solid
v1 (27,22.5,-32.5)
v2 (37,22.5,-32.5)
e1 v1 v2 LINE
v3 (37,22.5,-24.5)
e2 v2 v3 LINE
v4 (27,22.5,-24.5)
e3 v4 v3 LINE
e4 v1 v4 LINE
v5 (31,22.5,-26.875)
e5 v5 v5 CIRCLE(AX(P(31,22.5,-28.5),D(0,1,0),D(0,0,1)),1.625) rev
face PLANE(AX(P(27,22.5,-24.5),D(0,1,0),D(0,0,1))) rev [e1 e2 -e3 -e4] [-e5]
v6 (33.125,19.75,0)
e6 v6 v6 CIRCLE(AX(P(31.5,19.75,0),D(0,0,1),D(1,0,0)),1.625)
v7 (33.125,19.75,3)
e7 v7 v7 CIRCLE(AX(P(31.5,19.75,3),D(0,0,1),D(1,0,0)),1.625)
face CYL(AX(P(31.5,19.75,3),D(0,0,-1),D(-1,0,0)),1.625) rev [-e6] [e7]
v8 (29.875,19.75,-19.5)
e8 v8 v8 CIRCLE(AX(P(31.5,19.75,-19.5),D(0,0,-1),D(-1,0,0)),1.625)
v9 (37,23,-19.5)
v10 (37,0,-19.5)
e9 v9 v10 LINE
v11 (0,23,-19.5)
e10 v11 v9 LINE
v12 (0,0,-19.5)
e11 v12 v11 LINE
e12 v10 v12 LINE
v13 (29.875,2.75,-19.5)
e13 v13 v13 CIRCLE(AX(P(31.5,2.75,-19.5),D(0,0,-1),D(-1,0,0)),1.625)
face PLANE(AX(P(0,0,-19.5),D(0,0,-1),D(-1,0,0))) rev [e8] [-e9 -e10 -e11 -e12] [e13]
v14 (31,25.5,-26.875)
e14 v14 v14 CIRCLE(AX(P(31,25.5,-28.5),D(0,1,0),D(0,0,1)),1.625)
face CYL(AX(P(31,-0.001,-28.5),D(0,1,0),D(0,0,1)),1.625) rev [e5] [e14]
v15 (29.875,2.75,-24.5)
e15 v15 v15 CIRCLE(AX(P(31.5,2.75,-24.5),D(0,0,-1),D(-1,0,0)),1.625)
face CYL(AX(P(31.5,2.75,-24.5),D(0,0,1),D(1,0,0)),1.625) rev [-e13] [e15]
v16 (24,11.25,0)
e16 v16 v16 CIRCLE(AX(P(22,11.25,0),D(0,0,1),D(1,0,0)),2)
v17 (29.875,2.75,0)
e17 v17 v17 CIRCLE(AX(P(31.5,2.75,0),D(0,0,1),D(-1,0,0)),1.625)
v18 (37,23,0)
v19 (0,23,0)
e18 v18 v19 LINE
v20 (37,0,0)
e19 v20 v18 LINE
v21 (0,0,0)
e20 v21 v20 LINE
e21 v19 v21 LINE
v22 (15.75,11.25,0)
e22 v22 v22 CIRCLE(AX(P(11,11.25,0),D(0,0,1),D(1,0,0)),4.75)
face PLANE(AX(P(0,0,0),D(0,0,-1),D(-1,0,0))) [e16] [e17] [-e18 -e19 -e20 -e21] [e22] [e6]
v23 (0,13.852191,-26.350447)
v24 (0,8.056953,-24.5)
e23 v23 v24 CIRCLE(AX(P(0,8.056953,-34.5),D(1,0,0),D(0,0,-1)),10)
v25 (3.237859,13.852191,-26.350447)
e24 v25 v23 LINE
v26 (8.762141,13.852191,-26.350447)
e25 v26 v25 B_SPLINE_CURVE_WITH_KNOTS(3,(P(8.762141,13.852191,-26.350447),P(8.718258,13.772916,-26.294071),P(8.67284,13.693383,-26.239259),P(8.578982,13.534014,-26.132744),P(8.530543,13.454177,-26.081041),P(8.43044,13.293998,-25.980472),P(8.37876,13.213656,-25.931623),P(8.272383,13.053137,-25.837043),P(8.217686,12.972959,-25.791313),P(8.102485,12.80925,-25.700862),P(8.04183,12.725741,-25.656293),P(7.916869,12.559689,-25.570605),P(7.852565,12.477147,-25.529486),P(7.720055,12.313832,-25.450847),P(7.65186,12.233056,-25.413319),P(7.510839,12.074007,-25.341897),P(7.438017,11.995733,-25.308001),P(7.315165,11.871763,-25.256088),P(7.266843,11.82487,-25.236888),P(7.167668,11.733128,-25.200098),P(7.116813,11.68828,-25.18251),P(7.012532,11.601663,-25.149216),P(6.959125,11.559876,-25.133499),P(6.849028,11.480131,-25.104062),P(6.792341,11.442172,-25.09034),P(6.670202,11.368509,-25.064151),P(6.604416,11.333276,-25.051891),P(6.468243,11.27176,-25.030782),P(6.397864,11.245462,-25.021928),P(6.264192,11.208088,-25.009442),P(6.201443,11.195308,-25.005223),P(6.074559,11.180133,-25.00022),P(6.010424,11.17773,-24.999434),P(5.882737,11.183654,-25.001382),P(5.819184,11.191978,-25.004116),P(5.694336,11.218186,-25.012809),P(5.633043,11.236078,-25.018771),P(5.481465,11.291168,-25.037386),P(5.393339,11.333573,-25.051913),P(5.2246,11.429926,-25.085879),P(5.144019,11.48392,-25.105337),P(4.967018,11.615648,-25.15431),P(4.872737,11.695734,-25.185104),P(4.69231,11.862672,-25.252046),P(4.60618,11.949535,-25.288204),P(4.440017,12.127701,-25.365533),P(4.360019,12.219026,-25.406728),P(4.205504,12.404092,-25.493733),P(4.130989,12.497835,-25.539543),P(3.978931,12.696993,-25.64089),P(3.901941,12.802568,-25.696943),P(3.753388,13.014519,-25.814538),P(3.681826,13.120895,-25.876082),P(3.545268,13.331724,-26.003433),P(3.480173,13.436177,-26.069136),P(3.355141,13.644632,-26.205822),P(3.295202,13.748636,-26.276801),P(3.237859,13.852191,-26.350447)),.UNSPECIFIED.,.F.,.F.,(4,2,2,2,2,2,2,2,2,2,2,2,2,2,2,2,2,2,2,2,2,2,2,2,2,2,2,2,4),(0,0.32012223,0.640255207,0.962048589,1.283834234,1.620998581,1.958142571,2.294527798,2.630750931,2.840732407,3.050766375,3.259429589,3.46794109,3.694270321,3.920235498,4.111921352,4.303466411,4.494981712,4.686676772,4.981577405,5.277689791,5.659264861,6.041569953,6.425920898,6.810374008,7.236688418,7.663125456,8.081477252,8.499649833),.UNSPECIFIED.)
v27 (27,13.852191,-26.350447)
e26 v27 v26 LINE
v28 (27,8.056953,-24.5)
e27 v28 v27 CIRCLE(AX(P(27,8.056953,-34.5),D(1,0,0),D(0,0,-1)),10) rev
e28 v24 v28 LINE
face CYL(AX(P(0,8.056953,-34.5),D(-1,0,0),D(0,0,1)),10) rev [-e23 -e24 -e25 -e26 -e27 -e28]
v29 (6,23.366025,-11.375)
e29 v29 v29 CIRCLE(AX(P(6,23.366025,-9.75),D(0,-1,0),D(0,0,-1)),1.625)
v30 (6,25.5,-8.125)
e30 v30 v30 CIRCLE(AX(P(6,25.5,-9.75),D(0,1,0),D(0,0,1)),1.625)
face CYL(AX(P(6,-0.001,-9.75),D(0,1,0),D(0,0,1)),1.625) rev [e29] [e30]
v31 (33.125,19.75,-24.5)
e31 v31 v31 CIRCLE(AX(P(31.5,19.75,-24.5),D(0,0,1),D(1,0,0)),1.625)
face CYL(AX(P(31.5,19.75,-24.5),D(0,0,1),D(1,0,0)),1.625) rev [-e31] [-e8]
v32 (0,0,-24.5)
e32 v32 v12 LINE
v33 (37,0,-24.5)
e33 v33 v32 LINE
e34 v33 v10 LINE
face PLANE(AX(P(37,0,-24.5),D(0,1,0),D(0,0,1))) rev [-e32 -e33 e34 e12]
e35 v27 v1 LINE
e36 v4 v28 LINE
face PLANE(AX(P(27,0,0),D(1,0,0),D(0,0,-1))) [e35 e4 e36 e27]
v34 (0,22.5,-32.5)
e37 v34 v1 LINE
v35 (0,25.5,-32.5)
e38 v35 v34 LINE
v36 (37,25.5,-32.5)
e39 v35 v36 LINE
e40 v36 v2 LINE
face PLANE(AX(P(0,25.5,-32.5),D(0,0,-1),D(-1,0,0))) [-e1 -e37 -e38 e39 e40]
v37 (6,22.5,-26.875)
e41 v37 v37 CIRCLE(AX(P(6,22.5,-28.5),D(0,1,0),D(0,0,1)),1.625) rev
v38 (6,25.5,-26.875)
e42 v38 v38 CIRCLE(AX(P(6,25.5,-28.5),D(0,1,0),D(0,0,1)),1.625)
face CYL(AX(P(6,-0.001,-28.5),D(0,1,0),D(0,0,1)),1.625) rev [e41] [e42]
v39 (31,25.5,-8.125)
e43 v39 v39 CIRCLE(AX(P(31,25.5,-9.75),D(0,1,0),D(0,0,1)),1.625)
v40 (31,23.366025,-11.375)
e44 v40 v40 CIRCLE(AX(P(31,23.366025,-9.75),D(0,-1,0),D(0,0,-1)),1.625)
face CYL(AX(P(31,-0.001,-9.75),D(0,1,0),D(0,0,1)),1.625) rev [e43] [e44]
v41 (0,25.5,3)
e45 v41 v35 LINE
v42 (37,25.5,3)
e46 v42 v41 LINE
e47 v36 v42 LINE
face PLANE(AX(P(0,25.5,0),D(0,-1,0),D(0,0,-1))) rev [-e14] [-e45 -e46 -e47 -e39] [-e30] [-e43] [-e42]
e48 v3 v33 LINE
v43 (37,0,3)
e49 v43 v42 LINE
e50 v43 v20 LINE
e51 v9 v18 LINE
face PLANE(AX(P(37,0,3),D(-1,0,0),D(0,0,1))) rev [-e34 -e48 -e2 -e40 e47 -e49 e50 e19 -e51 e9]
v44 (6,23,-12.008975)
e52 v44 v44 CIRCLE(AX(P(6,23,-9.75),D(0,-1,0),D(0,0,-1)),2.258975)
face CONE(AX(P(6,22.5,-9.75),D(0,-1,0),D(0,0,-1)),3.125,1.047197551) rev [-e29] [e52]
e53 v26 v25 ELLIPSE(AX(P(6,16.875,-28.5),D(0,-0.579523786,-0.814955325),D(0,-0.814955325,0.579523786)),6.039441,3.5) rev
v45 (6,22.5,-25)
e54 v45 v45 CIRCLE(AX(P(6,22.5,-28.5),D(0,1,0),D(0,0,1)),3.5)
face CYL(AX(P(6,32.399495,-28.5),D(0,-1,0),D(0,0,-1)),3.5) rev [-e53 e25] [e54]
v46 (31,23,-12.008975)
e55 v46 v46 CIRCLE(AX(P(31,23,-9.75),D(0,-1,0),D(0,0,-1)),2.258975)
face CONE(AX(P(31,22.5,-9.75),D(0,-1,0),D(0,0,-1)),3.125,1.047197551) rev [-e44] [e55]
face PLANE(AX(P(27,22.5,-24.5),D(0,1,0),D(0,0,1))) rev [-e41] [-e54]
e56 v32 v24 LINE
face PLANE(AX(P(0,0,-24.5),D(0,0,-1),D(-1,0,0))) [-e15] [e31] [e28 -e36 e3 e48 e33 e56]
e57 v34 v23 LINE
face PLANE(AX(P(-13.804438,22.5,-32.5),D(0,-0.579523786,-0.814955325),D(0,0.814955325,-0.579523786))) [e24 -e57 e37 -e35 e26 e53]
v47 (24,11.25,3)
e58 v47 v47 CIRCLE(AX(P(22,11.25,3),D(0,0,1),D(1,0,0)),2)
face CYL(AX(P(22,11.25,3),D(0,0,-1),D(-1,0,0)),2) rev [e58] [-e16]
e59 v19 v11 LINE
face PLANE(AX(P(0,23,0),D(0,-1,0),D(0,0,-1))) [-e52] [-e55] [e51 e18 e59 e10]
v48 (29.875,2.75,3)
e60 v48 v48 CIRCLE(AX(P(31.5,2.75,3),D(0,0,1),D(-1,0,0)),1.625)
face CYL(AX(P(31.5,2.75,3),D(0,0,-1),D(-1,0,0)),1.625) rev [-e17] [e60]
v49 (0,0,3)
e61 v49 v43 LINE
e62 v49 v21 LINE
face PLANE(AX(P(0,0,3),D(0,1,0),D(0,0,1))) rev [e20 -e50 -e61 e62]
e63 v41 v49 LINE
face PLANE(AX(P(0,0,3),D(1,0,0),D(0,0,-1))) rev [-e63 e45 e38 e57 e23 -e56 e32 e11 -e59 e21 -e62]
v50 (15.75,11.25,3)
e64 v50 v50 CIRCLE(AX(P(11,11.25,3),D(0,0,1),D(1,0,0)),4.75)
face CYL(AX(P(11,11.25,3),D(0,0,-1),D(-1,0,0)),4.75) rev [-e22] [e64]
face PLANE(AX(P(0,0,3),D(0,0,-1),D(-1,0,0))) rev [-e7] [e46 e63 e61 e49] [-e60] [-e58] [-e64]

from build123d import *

# Parameters (mm, degrees)
BOSS_EXTRUDE1_OUTLINE_W   = 37
BOSS_EXTRUDE1_OUTLINE_H   = 22.5
BOSS_EXTRUDE1_OUTLINE_R   = 1.625
BOSS_EXTRUDE1_OUTLINE_R_2 = 4.75
BOSS_EXTRUDE1_OUTLINE_R_3 = 2
BOSS_EXTRUDE1_DEPTH       = 3
SKETCH2_W                 = 37
SKETCH2_H                 = 22.5
SKETCH2_R                 = 1.625
BOSS_EXTRUDE2_DEPTH       = 5
SKETCH3_W                 = 37
SKETCH3_H                 = 35.5
BOSS_EXTRUDE3_DEPTH       = 3
BOSS_EXTRUDE4_DEPTH       = 37
CUT_EXTRUDE1_DEPTH        = 10
CUT_EXTRUDE2_REACH        = 57.457
SKETCH7_R                 = 1.625
CHAMFER1_SIZE             = 1.5
CHAMFER1_SIZE2            = 0.866025404
FILLET1_R                 = 10
SKETCH8_R                 = 3.5
CUT_EXTRUDE3_DEPTH        = 22.5
SKETCH9_W                 = 37
SKETCH9_H                 = 19.5
CUT_EXTRUDE4_DEPTH        = 0.5


# Read off the part's stored shape, not the designer's step: Boss-Extrude1
with BuildPart() as part:
    # Boss-Extrude1 outline → Boss-Extrude1 (new body)
    with BuildSketch(Plane.XY):
        with Locations((18.5, 11.25)):
            Rectangle(BOSS_EXTRUDE1_OUTLINE_W, BOSS_EXTRUDE1_OUTLINE_H)
        with Locations((31.5, 2.75)):
            Circle(BOSS_EXTRUDE1_OUTLINE_R, mode=Mode.SUBTRACT)
        with Locations((11, 11.25)):
            Circle(BOSS_EXTRUDE1_OUTLINE_R_2, mode=Mode.SUBTRACT)
        with Locations((22, 11.25)):
            Circle(BOSS_EXTRUDE1_OUTLINE_R_3, mode=Mode.SUBTRACT)
        with Locations((31.5, 19.75)):
            Circle(BOSS_EXTRUDE1_OUTLINE_R, mode=Mode.SUBTRACT)
    extrude(amount=BOSS_EXTRUDE1_DEPTH)



with BuildPart() as body_2:
    # Sketch2 → Boss-Extrude2 (new body)
    with BuildSketch(Plane(origin=(0, 0, -19.5), x_dir=(-1, 0, 0), z_dir=(0, 0, -1))):
        with Locations((-18.5, 11.25)):
            Rectangle(SKETCH2_W, SKETCH2_H)
        with Locations((-31.5, 2.75)):
            Circle(SKETCH2_R, mode=Mode.SUBTRACT)
        with Locations(Location((-31.5, 19.75, 0), (0, 0, 180))):
            Circle(SKETCH2_R, mode=Mode.SUBTRACT)
    extrude(amount=BOSS_EXTRUDE2_DEPTH)


with BuildPart() as part_1:
    add(part.part)

    add(body_2.part)  # Boss-Extrude3 merges body 2
    # Sketch3 → Boss-Extrude3 (add)
    with BuildSketch(Plane.XZ.offset(-22.5)):
        with Locations((18.5, -14.75)):
            Rectangle(SKETCH3_W, SKETCH3_H)
    extrude(amount=-BOSS_EXTRUDE3_DEPTH)

    # Sketch6 → Boss-Extrude4 (add)
    with BuildSketch(Plane(origin=(37, 0, 0), x_dir=(0, 0, -1), z_dir=(1, 0, 0))):
        Polygon((32.5, 22.5), (24.5, 11.25), (24.5, 22.5), align=None)
    extrude(amount=-BOSS_EXTRUDE4_DEPTH)

    # Sketch6<2> → Cut-Extrude1 (cut)
    with BuildSketch(Plane(origin=(37, 0, 0), x_dir=(0, 0, -1), z_dir=(1, 0, 0))):
        Polygon((32.5, 22.5), (24.5, 11.25), (24.5, 22.5), align=None)
    extrude(amount=-CUT_EXTRUDE1_DEPTH, mode=Mode.SUBTRACT)

    # Sketch7 → Cut-Extrude2 (cut, up to next)
    with BuildSketch(Plane(origin=(0, 25.5, 0), x_dir=(-1, 0, 0), z_dir=(0, 1, 0)), mode=Mode.PRIVATE) as cut_extrude2_sk1:
        with Locations(Location((-6, -9.75, 0), (0, 0, 90))):
            Circle(SKETCH7_R)
    cut_extrude2_tool1 = extrude(cut_extrude2_sk1.sketch, amount=-CUT_EXTRUDE2_REACH, mode=Mode.PRIVATE) & part_1.part
    # Sketch7 → Cut-Extrude2 (cut, up to next)
    with BuildSketch(Plane(origin=(0, 25.5, 0), x_dir=(-1, 0, 0), z_dir=(0, 1, 0)), mode=Mode.PRIVATE) as cut_extrude2_sk2:
        with Locations(Location((-31, -9.75, 0), (0, 0, 90))):
            Circle(SKETCH7_R)
    cut_extrude2_tool2 = extrude(cut_extrude2_sk2.sketch, amount=-CUT_EXTRUDE2_REACH, mode=Mode.PRIVATE) & part_1.part
    # Sketch7 → Cut-Extrude2 (cut, up to next)
    with BuildSketch(Plane(origin=(0, 25.5, 0), x_dir=(-1, 0, 0), z_dir=(0, 1, 0)), mode=Mode.PRIVATE) as cut_extrude2_sk3:
        with Locations(Location((-6, -28.5, 0), (0, 0, 90))):
            Circle(SKETCH7_R)
    cut_extrude2_tool3 = extrude(cut_extrude2_sk3.sketch, amount=-CUT_EXTRUDE2_REACH, mode=Mode.PRIVATE) & part_1.part
    # Sketch7 → Cut-Extrude2 (cut, up to next)
    with BuildSketch(Plane(origin=(0, 25.5, 0), x_dir=(-1, 0, 0), z_dir=(0, 1, 0)), mode=Mode.PRIVATE) as cut_extrude2_sk4:
        with Locations(Location((-31, -28.5, 0), (0, 0, 90))):
            Circle(SKETCH7_R)
    cut_extrude2_tool4 = extrude(cut_extrude2_sk4.sketch, amount=-CUT_EXTRUDE2_REACH, mode=Mode.PRIVATE) & part_1.part
    add(cut_extrude2_tool1.solids().sort_by_distance((6, 25.5, -9.75))[0], mode=Mode.SUBTRACT)
    add(cut_extrude2_tool2.solids().sort_by_distance((31, 25.5, -9.75))[0], mode=Mode.SUBTRACT)
    add(cut_extrude2_tool3.solids().sort_by_distance((6, 25.5, -28.5))[0], mode=Mode.SUBTRACT)
    add(cut_extrude2_tool4.solids().sort_by_distance((31, 25.5, -28.5))[0], mode=Mode.SUBTRACT)

    # Chamfer1
    chamfer1_edges = [part_1.edges().sort_by_distance(p)[0] for p in [
        (31, 22.5, -11.375),
        (6, 22.5, -11.375),
    ]]
    chamfer1_side = [part_1.faces().sort_by_distance(p)[0] for p in [
        (18.5, 22.5, -9.75),
    ]]
    chamfer(chamfer1_edges, length=CHAMFER1_SIZE, length2=CHAMFER1_SIZE2, reference=chamfer1_side[0])

    # Fillet1
    fillet1_edges = [part_1.edges().sort_by_distance(p)[0] for p in [
        (13.5, 11.25, -24.5),
    ]]
    fillet(fillet1_edges, radius=FILLET1_R)

    # Sketch8 → Cut-Extrude3 (cut)
    with BuildSketch(Plane(origin=(0, 0, 0), x_dir=(1, 0, 0), z_dir=(0, 1, 0))):
        with Locations(Location((6, 28.5, 0), (0, 0, 322.109230385))):
            Circle(SKETCH8_R)
    extrude(amount=CUT_EXTRUDE3_DEPTH, mode=Mode.SUBTRACT)

    # Sketch9 → Cut-Extrude4 (cut)
    with BuildSketch(Plane(origin=(0, 22.5, 0), x_dir=(-1, 0, 0), z_dir=(0, -1, 0))):
        with Locations((-18.5, 9.75)):
            Rectangle(SKETCH9_W, SKETCH9_H)
    extrude(amount=-CUT_EXTRUDE4_DEPTH, mode=Mode.SUBTRACT)


solid = part_1.part
